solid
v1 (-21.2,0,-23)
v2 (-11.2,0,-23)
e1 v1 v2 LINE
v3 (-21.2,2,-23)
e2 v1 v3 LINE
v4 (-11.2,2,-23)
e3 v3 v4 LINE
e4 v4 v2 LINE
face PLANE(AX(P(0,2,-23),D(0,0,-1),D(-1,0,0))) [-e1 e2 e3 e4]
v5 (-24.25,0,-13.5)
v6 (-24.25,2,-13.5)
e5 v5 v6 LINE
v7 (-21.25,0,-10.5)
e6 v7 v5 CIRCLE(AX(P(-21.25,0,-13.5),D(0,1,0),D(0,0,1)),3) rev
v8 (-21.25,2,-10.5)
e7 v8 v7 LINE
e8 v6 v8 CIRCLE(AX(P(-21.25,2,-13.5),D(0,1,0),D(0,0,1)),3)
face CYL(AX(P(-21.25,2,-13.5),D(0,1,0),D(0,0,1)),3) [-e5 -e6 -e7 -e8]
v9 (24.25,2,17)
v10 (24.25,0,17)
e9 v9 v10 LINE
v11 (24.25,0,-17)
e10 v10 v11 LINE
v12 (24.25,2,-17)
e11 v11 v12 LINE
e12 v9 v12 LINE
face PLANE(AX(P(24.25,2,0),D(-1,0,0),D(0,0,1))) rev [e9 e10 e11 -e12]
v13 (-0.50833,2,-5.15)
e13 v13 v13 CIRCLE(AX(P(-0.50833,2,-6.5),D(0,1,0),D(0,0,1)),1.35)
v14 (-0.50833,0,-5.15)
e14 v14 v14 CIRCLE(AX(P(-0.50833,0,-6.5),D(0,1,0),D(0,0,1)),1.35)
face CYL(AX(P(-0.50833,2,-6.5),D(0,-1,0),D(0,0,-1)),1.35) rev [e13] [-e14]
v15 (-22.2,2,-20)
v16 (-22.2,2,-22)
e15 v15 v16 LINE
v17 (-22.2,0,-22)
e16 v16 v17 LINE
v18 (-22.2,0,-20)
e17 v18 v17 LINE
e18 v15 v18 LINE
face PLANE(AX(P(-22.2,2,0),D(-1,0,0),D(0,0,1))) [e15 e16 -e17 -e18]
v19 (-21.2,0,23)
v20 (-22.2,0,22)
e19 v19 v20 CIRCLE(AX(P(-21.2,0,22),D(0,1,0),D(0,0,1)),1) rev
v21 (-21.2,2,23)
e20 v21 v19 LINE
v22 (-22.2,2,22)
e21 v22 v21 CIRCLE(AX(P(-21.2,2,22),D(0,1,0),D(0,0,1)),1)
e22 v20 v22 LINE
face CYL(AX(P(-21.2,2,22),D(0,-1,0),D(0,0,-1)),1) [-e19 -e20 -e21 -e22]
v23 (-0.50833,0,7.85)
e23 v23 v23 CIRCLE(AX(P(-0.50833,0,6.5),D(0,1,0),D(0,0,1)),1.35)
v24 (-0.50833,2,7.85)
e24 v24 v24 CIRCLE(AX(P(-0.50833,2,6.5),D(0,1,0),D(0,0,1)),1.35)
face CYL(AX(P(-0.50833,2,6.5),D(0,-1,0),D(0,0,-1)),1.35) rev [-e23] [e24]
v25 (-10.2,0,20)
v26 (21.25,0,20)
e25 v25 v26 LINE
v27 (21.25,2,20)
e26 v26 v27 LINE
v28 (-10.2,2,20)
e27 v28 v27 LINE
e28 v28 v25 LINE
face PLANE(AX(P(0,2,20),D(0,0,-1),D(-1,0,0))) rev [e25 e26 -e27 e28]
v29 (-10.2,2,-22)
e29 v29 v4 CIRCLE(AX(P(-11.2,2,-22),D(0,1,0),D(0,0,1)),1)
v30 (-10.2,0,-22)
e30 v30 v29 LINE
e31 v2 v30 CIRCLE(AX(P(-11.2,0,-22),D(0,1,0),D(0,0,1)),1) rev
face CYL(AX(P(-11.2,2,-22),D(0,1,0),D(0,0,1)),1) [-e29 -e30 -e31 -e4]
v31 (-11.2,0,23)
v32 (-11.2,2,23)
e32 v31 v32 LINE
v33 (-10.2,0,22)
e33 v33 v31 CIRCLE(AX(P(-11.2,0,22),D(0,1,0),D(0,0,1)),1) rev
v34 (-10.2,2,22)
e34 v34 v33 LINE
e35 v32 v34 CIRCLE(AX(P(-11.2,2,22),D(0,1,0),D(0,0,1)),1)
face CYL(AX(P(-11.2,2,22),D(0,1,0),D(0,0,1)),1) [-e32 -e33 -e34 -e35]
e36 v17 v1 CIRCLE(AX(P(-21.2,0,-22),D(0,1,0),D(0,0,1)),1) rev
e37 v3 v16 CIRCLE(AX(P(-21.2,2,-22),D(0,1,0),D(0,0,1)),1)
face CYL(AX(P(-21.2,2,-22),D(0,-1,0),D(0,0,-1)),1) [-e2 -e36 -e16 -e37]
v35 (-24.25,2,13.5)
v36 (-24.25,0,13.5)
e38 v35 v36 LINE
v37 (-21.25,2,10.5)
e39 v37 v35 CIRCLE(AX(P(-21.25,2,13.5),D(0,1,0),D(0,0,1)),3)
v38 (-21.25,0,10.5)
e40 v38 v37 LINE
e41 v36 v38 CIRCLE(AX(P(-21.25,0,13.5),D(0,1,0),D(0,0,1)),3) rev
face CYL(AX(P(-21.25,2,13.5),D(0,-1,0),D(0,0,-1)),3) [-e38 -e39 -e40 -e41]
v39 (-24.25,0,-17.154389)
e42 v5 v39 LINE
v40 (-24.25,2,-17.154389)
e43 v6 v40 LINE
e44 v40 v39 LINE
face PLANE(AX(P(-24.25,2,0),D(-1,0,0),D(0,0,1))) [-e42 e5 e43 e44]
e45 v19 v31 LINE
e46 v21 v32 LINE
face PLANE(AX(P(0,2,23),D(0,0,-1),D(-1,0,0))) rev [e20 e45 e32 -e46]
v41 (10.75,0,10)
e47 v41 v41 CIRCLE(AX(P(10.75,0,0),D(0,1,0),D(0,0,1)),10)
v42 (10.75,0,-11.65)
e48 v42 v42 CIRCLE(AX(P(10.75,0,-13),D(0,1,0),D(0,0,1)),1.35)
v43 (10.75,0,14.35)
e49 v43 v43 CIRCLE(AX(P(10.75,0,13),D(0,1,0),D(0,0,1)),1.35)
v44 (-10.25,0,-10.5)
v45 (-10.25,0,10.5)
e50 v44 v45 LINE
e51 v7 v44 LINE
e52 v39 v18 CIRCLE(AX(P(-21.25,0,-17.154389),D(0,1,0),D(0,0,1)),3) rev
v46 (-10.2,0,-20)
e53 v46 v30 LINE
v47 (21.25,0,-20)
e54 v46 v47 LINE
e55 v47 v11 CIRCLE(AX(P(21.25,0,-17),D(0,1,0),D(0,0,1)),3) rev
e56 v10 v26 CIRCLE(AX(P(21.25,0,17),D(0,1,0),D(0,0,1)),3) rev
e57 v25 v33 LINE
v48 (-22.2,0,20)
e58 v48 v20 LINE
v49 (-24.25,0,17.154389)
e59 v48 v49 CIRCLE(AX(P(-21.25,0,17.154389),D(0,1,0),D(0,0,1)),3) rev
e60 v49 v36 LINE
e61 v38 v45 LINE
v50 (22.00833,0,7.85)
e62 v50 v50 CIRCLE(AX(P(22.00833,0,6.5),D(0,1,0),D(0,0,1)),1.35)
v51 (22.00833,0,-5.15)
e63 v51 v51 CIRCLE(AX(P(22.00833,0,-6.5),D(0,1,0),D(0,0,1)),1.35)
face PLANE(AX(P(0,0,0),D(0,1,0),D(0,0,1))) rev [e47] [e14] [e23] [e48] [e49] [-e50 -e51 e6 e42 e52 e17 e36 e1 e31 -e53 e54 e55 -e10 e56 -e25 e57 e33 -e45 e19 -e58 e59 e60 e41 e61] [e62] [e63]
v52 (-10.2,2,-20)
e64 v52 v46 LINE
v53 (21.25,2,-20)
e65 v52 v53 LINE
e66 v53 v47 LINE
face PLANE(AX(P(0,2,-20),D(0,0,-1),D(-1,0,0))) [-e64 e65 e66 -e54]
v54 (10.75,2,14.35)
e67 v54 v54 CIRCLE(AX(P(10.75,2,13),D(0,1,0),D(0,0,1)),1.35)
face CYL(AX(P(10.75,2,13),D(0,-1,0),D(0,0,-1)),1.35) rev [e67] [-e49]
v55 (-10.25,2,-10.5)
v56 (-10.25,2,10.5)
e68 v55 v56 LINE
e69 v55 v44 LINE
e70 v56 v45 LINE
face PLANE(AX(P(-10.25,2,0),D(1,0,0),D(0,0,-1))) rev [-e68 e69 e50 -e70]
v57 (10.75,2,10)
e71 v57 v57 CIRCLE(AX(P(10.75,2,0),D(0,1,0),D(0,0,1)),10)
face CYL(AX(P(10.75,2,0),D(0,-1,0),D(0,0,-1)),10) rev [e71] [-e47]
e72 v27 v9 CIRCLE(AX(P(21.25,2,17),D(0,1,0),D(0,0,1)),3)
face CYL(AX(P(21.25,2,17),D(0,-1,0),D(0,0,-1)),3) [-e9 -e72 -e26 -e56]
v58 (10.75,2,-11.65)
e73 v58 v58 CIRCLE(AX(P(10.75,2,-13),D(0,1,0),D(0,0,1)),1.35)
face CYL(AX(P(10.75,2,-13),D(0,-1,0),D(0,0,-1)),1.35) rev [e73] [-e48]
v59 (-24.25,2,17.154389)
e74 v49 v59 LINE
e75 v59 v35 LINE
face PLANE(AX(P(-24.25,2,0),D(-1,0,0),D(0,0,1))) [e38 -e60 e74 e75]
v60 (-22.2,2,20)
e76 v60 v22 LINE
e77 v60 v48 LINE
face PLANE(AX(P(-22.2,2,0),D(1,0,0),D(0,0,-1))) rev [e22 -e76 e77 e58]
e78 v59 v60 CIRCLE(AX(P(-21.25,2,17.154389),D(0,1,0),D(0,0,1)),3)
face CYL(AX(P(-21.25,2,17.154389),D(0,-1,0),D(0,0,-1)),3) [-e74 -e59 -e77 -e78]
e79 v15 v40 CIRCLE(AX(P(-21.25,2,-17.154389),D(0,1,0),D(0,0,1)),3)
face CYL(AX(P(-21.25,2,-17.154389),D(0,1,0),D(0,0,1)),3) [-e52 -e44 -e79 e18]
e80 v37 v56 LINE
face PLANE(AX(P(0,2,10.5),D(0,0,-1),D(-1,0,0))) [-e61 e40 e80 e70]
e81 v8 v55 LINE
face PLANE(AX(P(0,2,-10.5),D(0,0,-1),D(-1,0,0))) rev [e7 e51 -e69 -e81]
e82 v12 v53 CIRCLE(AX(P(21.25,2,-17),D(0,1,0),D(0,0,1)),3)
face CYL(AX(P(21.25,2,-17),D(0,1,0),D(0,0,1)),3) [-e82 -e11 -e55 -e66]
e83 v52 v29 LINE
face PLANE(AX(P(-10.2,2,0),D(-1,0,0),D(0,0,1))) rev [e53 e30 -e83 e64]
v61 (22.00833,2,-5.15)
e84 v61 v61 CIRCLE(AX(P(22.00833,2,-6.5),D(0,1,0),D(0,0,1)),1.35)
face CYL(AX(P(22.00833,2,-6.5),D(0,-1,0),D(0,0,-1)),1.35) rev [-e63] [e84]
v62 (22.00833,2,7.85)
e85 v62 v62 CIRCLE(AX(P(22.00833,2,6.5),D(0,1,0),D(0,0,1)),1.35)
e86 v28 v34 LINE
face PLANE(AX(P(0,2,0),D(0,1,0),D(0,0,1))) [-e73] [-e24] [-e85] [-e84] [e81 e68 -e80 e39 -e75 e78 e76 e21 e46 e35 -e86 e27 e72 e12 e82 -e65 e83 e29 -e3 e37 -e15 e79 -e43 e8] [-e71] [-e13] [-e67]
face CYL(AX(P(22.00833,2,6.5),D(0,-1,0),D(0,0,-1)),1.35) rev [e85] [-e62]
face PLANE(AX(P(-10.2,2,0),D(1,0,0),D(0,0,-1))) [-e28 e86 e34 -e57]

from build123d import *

# Parameters (mm, degrees)
SKETCH_1_W      = 12
SKETCH_1_H      = 3
SKETCH_1_R      = 10
EXTRUDE_1_DEPTH = 2
FILLET_1_R      = 3
FILLET_2_R      = 1


with BuildPart() as part:
    # 草图1 → 凸台-拉伸1 (new body)
    # profile 1 of 4: a face of its own
    with BuildSketch(Plane(origin=(0, 0, 0), x_dir=(1, 0, 0), z_dir=(0, 1, 0))):
        Polygon((-24.25, -10.5), (-24.25, -20), (-22.2, -20), (-10.2, -20), (24.25, -20), (24.25, 20), (-10.2, 20), (-22.2, 20), (-24.25, 20), (-24.25, 10.5), (-10.25, 10.5), (-10.25, -10.5), align=None)
        with BuildLine():
            ThreePointArc((22.621714683, 5.297394688), (23.75, 0), (22.621714683, -5.297394688))
            ThreePointArc((22.621714683, -5.297394688), (23.159540262, -5.794864902), (23.358330249, -6.5))
            ThreePointArc((23.358330249, -6.5), (22.652739816, -7.686269915), (21.273535715, -7.632509158))
            ThreePointArc((21.273535715, -7.632509158), (17.25, -11.258330249), (12.098178968, -12.929903846))
            ThreePointArc((12.098178968, -12.929903846), (12.099544665, -12.964940098), (12.1, -13))
            ThreePointArc((12.1, -13), (10.714940098, -14.349544665), (9.401821032, -12.929903846))
            ThreePointArc((9.401821032, -12.929903846), (4.25, -11.258330249), (0.226464285, -7.632509158))
            ThreePointArc((0.226464285, -7.632509158), (-1.677464544, -7.175), (-1.121714683, -5.297394688))
            ThreePointArc((-1.121714683, -5.297394688), (-2.25, 0), (-1.121714683, 5.297394688))
            ThreePointArc((-1.121714683, 5.297394688), (-1.677464544, 7.175), (0.226464285, 7.632509158))
            ThreePointArc((0.226464285, 7.632509158), (4.25, 11.258330249), (9.401821032, 12.929903846))
            ThreePointArc((9.401821032, 12.929903846), (10.714940098, 14.349544665), (12.1, 13))
            ThreePointArc((12.1, 13), (12.099544665, 12.964940098), (12.098178968, 12.929903846))
            ThreePointArc((12.098178968, 12.929903846), (17.25, 11.258330249), (21.273535715, 7.632509158))
            ThreePointArc((21.273535715, 7.632509158), (22.652739816, 7.686269915), (23.358330249, 6.5))
            ThreePointArc((23.358330249, 6.5), (23.159540262, 5.794864902), (22.621714683, 5.297394688))
        make_face(mode=Mode.SUBTRACT)
    # profile 2 of 4: a face of its own
    with BuildSketch(Plane(origin=(0, 0, 0), x_dir=(1, 0, 0), z_dir=(0, 1, 0))):
        with Locations((-16.2, 21.5)):
            Rectangle(SKETCH_1_W, SKETCH_1_H)
    # profile 3 of 4: a face of its own
    with BuildSketch(Plane(origin=(0, 0, 0), x_dir=(1, 0, 0), z_dir=(0, 1, 0))):
        with Locations((-16.2, -21.5)):
            Rectangle(SKETCH_1_W, SKETCH_1_H)
    # profile 4 of 4: a face of its own
    with BuildSketch(Plane(origin=(0, 0, 0), x_dir=(1, 0, 0), z_dir=(0, 1, 0))):
        with BuildLine():
            ThreePointArc((21.273535715, -7.632509158), (20.839195954, -5.825), (22.621714683, -5.297394688))
            ThreePointArc((22.621714683, -5.297394688), (23.75, 0), (22.621714683, 5.297394688))
            ThreePointArc((22.621714683, 5.297394688), (20.839195954, 5.825), (21.273535715, 7.632509158))
            ThreePointArc((21.273535715, 7.632509158), (17.25, 11.258330249), (12.098178968, 12.929903846))
            ThreePointArc((12.098178968, 12.929903846), (10.75, 11.65), (9.401821032, 12.929903846))
            ThreePointArc((9.401821032, 12.929903846), (4.25, 11.258330249), (0.226464285, 7.632509158))
            ThreePointArc((0.226464285, 7.632509158), (0.677939665, 7.144409567), (0.841669751, 6.5))
            ThreePointArc((0.841669751, 6.5), (0.196804849, 5.348789987), (-1.121714683, 5.297394688))
            ThreePointArc((-1.121714683, 5.297394688), (-2.25, 0), (-1.121714683, -5.297394688))
            ThreePointArc((-1.121714683, -5.297394688), (0.196804849, -5.348789987), (0.841669751, -6.5))
            ThreePointArc((0.841669751, -6.5), (0.677939665, -7.144409567), (0.226464285, -7.632509158))
            ThreePointArc((0.226464285, -7.632509158), (4.25, -11.258330249), (9.401821032, -12.929903846))
            ThreePointArc((9.401821032, -12.929903846), (10.75, -11.65), (12.098178968, -12.929903846))
            ThreePointArc((12.098178968, -12.929903846), (17.25, -11.258330249), (21.273535715, -7.632509158))
        make_face()
        with Locations(Location((10.75, 0, 0), (0, 0, 270))):
            Circle(SKETCH_1_R, mode=Mode.SUBTRACT)
    extrude(amount=EXTRUDE_1_DEPTH)

    # 圆角1
    # the kernel refuses this fillet: 3 mm, written as the material it takes off along each edge
    with BuildSketch(Plane(origin=(-24.25, -7.5, -10.5), x_dir=(1, 0, 0), z_dir=(0, 1, 0)), Plane(origin=(24.25, -7.5, -20), x_dir=(-1, 0, 0), z_dir=(0, 1, 0)), Plane(origin=(24.25, -7.5, 20), x_dir=(0, 0, -1), z_dir=(0, 1, 0)), Plane(origin=(-24.25, -7.5, 10.5), x_dir=(0, 0, 1), z_dir=(0, 1, 0))) as fillet_1_piece_1:
        with BuildLine():
            CenterArc((FILLET_1_R, FILLET_1_R), FILLET_1_R, 180, 90)
            Line((0, FILLET_1_R), (-FILLET_1_R * 0.02, FILLET_1_R))
            Line((-FILLET_1_R * 0.02, FILLET_1_R), (-FILLET_1_R * 0.02, -FILLET_1_R * 0.02))
            Line((-FILLET_1_R * 0.02, -FILLET_1_R * 0.02), (FILLET_1_R, -FILLET_1_R * 0.02))
            Line((FILLET_1_R, -FILLET_1_R * 0.02), (FILLET_1_R, 0))
        make_face()
    extrude(amount=17, mode=Mode.SUBTRACT)
    with BuildSketch(Plane(origin=(-24.25, -7.114026638, -20), x_dir=(0, 0, 1), z_dir=(0, 1, 0))) as fillet_1_piece_2:
        with BuildLine():
            CenterArc((2.845610655, 3), FILLET_1_R, 198.461458297, 71.538541703)
            Line((0, 2.05), (-0.056912213, 2.031))
            ThreePointArc((-0.056912213, 2.031), (-0.06, 1.025), (-0.06, 0))
            Line((-0.06, 0), (0, -0.06))
            Line((0, -0.06), (2.845610655, -0.06))
            Line((2.845610655, -0.06), (2.845610655, 0))
        make_face()
    extrude(amount=16.228053275, mode=Mode.SUBTRACT)
    with BuildSketch(Plane(origin=(-24.25, -7.114026638, 20), x_dir=(0, 0, -1), z_dir=(0, 1, 0))) as fillet_1_piece_3:
        with BuildLine():
            CenterArc((2.845610655, -3), FILLET_1_R, 90, 71.538541703)
            Line((0, -2.05), (-0.056912213, -2.031))
            ThreePointArc((-0.056912213, -2.031), (-0.06, -1.025), (-0.06, 0))
            Line((-0.06, 0), (0, 0.06))
            Line((0, 0.06), (2.845610655, 0.06))
            Line((2.845610655, 0.06), (2.845610655, 0))
        make_face()
    extrude(amount=16.228053275, mode=Mode.SUBTRACT)

    # 圆角2
    fillet_2_edges = [part.edges().sort_by_distance(p)[0] for p in [
        (-22.2, 1, -23),
        (-10.2, 1, -23),
        (-10.2, 1, 23),
        (-22.2, 1, 23),
    ]]
    fillet(fillet_2_edges, radius=FILLET_2_R)


solid = part.part
